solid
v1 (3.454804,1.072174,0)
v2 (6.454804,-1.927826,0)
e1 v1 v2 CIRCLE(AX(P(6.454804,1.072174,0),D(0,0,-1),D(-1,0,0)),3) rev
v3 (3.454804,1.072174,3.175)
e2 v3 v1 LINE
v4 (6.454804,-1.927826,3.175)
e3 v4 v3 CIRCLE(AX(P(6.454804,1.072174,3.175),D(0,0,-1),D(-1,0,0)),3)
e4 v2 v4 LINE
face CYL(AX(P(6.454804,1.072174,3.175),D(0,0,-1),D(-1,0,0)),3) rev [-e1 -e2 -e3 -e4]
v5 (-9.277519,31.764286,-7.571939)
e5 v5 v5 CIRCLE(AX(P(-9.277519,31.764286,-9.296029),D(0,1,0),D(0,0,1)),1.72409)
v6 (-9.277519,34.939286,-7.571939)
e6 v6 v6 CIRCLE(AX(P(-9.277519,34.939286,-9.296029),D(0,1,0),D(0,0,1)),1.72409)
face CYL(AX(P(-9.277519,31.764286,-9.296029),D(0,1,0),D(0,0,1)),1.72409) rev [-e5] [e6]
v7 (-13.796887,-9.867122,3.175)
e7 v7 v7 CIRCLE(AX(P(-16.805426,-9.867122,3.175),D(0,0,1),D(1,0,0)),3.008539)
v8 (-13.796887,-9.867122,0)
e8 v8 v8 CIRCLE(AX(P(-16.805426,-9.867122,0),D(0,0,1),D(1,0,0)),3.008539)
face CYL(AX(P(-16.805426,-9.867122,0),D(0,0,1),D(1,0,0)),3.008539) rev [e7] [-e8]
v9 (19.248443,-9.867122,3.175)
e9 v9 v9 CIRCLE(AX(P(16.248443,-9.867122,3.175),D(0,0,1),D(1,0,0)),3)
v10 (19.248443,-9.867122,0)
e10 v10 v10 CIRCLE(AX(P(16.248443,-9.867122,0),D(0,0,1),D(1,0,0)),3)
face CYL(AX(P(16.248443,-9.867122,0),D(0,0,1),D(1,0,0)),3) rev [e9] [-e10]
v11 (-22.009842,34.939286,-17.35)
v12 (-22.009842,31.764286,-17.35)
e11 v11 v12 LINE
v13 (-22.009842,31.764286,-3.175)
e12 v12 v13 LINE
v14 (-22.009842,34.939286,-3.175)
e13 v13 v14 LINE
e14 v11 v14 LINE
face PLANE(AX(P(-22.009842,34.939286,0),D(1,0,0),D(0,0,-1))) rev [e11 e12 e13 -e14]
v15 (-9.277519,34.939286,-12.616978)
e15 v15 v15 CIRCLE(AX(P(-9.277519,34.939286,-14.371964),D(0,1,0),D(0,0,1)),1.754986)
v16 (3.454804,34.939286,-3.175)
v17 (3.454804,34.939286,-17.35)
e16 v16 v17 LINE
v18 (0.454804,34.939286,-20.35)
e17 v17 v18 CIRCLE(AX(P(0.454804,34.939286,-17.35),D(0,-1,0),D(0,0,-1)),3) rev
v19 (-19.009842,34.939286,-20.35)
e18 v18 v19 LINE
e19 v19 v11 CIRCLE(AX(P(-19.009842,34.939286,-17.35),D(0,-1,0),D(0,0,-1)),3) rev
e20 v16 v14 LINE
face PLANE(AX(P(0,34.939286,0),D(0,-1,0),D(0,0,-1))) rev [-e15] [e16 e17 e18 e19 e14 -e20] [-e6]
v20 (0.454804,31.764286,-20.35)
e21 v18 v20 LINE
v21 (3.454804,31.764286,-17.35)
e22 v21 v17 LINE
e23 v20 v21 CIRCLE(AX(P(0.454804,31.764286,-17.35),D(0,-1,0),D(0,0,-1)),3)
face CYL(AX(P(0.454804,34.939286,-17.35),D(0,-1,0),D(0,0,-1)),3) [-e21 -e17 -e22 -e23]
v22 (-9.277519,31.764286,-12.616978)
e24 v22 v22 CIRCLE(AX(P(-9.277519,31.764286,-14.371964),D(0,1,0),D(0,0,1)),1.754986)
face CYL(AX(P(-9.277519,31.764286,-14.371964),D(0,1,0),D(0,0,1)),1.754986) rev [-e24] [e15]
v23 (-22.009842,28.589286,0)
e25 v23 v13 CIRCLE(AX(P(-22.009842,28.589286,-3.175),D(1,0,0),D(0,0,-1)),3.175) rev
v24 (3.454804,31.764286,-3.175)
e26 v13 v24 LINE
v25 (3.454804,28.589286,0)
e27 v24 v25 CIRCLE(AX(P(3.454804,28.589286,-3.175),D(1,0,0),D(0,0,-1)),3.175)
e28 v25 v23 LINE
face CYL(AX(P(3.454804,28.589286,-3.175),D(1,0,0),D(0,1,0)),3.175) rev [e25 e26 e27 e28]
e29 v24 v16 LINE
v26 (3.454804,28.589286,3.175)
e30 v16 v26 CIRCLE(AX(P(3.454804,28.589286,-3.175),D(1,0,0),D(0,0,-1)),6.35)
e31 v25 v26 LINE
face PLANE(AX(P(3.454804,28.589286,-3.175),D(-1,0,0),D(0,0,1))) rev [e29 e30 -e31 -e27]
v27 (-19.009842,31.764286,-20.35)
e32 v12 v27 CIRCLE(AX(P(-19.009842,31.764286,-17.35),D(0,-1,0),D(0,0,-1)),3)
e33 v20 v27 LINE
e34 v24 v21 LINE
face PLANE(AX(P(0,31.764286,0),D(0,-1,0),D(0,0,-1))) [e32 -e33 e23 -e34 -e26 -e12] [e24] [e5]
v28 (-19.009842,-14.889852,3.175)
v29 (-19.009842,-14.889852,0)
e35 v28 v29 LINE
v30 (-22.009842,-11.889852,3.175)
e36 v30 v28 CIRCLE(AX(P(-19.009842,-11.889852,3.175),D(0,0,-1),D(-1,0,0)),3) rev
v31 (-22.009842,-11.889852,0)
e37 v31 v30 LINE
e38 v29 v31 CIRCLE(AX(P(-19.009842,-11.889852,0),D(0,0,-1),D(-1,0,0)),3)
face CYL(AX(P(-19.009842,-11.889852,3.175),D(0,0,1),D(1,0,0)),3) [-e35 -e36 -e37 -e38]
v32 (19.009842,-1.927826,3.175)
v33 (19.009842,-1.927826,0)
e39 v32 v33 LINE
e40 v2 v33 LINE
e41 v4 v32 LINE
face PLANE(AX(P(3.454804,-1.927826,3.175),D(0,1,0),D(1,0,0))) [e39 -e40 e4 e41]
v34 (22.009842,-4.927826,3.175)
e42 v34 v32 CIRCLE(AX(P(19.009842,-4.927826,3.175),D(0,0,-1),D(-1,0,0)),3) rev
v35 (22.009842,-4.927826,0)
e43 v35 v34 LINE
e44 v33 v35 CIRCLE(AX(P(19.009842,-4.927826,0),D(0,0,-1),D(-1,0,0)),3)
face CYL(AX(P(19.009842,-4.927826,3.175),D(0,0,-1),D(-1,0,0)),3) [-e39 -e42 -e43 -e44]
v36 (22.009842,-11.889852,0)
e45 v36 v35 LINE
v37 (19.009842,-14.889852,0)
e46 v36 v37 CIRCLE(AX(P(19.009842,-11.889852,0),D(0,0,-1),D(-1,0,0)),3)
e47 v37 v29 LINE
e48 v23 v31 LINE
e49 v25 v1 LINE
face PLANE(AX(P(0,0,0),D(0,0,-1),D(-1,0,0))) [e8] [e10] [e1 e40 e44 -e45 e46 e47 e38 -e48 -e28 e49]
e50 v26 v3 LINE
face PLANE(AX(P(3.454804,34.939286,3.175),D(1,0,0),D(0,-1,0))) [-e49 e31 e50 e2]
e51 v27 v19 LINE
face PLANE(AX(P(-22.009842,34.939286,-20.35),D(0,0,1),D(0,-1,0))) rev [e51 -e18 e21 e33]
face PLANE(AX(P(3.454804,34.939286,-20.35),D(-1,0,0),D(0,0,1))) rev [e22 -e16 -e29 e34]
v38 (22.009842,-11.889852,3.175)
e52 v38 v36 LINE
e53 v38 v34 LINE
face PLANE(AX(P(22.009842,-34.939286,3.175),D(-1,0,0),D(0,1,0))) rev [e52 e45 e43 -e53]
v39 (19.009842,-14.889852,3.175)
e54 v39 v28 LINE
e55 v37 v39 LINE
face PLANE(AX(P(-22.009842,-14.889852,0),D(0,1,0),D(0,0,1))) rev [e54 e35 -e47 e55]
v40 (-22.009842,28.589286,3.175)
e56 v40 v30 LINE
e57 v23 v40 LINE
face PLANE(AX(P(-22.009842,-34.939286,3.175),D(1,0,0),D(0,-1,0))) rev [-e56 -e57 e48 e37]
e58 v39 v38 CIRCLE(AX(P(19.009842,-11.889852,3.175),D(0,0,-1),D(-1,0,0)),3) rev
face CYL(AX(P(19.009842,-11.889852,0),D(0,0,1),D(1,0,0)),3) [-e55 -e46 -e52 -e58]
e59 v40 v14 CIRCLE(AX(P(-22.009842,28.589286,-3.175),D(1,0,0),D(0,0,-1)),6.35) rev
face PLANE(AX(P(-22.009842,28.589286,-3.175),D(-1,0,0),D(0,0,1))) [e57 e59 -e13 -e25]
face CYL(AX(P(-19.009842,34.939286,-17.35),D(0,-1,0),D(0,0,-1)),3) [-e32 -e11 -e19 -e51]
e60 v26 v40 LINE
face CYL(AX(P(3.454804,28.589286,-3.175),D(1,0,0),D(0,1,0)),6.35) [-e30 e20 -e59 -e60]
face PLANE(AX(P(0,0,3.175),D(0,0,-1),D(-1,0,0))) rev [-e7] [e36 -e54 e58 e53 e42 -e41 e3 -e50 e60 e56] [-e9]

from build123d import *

# Parameters (mm, degrees)
SKETCH1_W                    = 44.01968481
SKETCH1_H                    = 69.878571894
BOSS_EXTRUDE1_DEPTH          = 3.175
SKETCH3_W                    = 18.555037993
SKETCH3_H                    = 36.867111451
CUT_EXTRUDE1_DEPTH           = 3.175
EDGE_FLANGE1_STRIP_W         = 19.05
EDGE_FLANGE1_STRIP_H         = 3.175
EDGE_FLANGE1_STRIP_CUT_DEPTH = 25.464646817
EDGE_FLANGE1_DEPTH           = 25.464646817
SKETCH22_W                   = 44.01968481
SKETCH22_H                   = 20.04943399
CUT_EXTRUDE2_DEPTH           = 3.175
FILLET1_R                    = 3
SKETCH23_R                   = 3.008539127
SKETCH23_R_2                 = 3
CUT_EXTRUDE3_DEPTH           = 3.175
SKETCH24_R                   = 1.724090174
SKETCH24_R_2                 = 1.754985839
CUT_EXTRUDE4_DEPTH           = 3.175


# Sheet-metal steps are written as plain solids
with BuildPart() as part:
    # Sketch1 → Boss-Extrude1 (new body)
    with BuildSketch(Plane.XY):
        Rectangle(SKETCH1_W, SKETCH1_H)
    extrude(amount=BOSS_EXTRUDE1_DEPTH)

    # Sketch3 → Cut-Extrude1 (cut)
    with BuildSketch(Plane.XY.offset(3.175)):
        with Locations((12.732323409, 16.505730222)):
            Rectangle(SKETCH3_W, SKETCH3_H)
    extrude(amount=-CUT_EXTRUDE1_DEPTH, mode=Mode.SUBTRACT)

    # Edge-Flange1 strip (across the edge) → Edge-Flange1 strip cut (cut)
    with BuildSketch(Plane(origin=(-22.009842405, 34.939285947, 0), x_dir=(0, -1, 0), z_dir=(1, 0, 0))):
        with Locations((-3.175, -1.5875)):
            Rectangle(EDGE_FLANGE1_STRIP_W, EDGE_FLANGE1_STRIP_H)
    extrude(amount=EDGE_FLANGE1_STRIP_CUT_DEPTH, mode=Mode.SUBTRACT)

    # Edge-Flange1 section (across the edge) → Edge-Flange1 (add)
    with BuildSketch(Plane(origin=(-22.009842405, 34.939285947, 0), x_dir=(0, -1, 0), z_dir=(1, 0, 0))):
        with BuildLine():
            Line((0, 3.175), (0, 20.35))
            Line((0, 20.35), (3.175, 20.35))
            Line((3.175, 20.35), (3.175, 3.175))
            ThreePointArc((3.175, 3.175), (4.10493597, 0.92993597), (6.35, 0))
            Line((6.35, 0), (6.35, -3.175))
            ThreePointArc((6.35, -3.175), (1.859871939, -1.315128061), (0, 3.175))
        make_face()
    extrude(amount=EDGE_FLANGE1_DEPTH)

    # Sketch22 → Cut-Extrude2 (cut)
    with BuildSketch(Plane.XY.offset(3.175)):
        with Locations((0, -24.914568952)):
            Rectangle(SKETCH22_W, SKETCH22_H)
    extrude(amount=-CUT_EXTRUDE2_DEPTH, mode=Mode.SUBTRACT)

    # Fillet1
    fillet1_edges = [part.edges().sort_by_distance(p)[0] for p in [
        (22.009842405, -1.927825504, 1.5875),
        (3.454804412, -1.927825504, 1.5875),
        (-22.009842405, 33.351785947, -20.35),
        (3.454804412, 33.351785947, -20.35),
        (-22.009842405, -14.889851957, 1.5875),
        (22.009842405, -14.889851957, 1.5875),
    ]]
    fillet(fillet1_edges, radius=FILLET1_R)

    # Sketch23 → Cut-Extrude3 (cut)
    with BuildSketch(Plane.XY.offset(3.175)):
        with Locations((-16.805425884, -9.867122138)):
            Circle(SKETCH23_R)
        with Locations((16.248443226, -9.867122138)):
            Circle(SKETCH23_R_2)
    extrude(amount=-CUT_EXTRUDE3_DEPTH, mode=Mode.SUBTRACT)

    # Sketch24 → Cut-Extrude4 (cut)
    with BuildSketch(Plane(origin=(0, 34.939285947, 0), x_dir=(1, 0, 0), z_dir=(0, 1, 0))):
        with Locations(Location((-9.277518997, 9.296029356, 0), (0, 0, 270))):
            Circle(SKETCH24_R)
        with Locations(Location((-9.277518997, 14.371964171, 0), (0, 0, 270))):
            Circle(SKETCH24_R_2)
    extrude(amount=-CUT_EXTRUDE4_DEPTH, mode=Mode.SUBTRACT)


solid = part.part
